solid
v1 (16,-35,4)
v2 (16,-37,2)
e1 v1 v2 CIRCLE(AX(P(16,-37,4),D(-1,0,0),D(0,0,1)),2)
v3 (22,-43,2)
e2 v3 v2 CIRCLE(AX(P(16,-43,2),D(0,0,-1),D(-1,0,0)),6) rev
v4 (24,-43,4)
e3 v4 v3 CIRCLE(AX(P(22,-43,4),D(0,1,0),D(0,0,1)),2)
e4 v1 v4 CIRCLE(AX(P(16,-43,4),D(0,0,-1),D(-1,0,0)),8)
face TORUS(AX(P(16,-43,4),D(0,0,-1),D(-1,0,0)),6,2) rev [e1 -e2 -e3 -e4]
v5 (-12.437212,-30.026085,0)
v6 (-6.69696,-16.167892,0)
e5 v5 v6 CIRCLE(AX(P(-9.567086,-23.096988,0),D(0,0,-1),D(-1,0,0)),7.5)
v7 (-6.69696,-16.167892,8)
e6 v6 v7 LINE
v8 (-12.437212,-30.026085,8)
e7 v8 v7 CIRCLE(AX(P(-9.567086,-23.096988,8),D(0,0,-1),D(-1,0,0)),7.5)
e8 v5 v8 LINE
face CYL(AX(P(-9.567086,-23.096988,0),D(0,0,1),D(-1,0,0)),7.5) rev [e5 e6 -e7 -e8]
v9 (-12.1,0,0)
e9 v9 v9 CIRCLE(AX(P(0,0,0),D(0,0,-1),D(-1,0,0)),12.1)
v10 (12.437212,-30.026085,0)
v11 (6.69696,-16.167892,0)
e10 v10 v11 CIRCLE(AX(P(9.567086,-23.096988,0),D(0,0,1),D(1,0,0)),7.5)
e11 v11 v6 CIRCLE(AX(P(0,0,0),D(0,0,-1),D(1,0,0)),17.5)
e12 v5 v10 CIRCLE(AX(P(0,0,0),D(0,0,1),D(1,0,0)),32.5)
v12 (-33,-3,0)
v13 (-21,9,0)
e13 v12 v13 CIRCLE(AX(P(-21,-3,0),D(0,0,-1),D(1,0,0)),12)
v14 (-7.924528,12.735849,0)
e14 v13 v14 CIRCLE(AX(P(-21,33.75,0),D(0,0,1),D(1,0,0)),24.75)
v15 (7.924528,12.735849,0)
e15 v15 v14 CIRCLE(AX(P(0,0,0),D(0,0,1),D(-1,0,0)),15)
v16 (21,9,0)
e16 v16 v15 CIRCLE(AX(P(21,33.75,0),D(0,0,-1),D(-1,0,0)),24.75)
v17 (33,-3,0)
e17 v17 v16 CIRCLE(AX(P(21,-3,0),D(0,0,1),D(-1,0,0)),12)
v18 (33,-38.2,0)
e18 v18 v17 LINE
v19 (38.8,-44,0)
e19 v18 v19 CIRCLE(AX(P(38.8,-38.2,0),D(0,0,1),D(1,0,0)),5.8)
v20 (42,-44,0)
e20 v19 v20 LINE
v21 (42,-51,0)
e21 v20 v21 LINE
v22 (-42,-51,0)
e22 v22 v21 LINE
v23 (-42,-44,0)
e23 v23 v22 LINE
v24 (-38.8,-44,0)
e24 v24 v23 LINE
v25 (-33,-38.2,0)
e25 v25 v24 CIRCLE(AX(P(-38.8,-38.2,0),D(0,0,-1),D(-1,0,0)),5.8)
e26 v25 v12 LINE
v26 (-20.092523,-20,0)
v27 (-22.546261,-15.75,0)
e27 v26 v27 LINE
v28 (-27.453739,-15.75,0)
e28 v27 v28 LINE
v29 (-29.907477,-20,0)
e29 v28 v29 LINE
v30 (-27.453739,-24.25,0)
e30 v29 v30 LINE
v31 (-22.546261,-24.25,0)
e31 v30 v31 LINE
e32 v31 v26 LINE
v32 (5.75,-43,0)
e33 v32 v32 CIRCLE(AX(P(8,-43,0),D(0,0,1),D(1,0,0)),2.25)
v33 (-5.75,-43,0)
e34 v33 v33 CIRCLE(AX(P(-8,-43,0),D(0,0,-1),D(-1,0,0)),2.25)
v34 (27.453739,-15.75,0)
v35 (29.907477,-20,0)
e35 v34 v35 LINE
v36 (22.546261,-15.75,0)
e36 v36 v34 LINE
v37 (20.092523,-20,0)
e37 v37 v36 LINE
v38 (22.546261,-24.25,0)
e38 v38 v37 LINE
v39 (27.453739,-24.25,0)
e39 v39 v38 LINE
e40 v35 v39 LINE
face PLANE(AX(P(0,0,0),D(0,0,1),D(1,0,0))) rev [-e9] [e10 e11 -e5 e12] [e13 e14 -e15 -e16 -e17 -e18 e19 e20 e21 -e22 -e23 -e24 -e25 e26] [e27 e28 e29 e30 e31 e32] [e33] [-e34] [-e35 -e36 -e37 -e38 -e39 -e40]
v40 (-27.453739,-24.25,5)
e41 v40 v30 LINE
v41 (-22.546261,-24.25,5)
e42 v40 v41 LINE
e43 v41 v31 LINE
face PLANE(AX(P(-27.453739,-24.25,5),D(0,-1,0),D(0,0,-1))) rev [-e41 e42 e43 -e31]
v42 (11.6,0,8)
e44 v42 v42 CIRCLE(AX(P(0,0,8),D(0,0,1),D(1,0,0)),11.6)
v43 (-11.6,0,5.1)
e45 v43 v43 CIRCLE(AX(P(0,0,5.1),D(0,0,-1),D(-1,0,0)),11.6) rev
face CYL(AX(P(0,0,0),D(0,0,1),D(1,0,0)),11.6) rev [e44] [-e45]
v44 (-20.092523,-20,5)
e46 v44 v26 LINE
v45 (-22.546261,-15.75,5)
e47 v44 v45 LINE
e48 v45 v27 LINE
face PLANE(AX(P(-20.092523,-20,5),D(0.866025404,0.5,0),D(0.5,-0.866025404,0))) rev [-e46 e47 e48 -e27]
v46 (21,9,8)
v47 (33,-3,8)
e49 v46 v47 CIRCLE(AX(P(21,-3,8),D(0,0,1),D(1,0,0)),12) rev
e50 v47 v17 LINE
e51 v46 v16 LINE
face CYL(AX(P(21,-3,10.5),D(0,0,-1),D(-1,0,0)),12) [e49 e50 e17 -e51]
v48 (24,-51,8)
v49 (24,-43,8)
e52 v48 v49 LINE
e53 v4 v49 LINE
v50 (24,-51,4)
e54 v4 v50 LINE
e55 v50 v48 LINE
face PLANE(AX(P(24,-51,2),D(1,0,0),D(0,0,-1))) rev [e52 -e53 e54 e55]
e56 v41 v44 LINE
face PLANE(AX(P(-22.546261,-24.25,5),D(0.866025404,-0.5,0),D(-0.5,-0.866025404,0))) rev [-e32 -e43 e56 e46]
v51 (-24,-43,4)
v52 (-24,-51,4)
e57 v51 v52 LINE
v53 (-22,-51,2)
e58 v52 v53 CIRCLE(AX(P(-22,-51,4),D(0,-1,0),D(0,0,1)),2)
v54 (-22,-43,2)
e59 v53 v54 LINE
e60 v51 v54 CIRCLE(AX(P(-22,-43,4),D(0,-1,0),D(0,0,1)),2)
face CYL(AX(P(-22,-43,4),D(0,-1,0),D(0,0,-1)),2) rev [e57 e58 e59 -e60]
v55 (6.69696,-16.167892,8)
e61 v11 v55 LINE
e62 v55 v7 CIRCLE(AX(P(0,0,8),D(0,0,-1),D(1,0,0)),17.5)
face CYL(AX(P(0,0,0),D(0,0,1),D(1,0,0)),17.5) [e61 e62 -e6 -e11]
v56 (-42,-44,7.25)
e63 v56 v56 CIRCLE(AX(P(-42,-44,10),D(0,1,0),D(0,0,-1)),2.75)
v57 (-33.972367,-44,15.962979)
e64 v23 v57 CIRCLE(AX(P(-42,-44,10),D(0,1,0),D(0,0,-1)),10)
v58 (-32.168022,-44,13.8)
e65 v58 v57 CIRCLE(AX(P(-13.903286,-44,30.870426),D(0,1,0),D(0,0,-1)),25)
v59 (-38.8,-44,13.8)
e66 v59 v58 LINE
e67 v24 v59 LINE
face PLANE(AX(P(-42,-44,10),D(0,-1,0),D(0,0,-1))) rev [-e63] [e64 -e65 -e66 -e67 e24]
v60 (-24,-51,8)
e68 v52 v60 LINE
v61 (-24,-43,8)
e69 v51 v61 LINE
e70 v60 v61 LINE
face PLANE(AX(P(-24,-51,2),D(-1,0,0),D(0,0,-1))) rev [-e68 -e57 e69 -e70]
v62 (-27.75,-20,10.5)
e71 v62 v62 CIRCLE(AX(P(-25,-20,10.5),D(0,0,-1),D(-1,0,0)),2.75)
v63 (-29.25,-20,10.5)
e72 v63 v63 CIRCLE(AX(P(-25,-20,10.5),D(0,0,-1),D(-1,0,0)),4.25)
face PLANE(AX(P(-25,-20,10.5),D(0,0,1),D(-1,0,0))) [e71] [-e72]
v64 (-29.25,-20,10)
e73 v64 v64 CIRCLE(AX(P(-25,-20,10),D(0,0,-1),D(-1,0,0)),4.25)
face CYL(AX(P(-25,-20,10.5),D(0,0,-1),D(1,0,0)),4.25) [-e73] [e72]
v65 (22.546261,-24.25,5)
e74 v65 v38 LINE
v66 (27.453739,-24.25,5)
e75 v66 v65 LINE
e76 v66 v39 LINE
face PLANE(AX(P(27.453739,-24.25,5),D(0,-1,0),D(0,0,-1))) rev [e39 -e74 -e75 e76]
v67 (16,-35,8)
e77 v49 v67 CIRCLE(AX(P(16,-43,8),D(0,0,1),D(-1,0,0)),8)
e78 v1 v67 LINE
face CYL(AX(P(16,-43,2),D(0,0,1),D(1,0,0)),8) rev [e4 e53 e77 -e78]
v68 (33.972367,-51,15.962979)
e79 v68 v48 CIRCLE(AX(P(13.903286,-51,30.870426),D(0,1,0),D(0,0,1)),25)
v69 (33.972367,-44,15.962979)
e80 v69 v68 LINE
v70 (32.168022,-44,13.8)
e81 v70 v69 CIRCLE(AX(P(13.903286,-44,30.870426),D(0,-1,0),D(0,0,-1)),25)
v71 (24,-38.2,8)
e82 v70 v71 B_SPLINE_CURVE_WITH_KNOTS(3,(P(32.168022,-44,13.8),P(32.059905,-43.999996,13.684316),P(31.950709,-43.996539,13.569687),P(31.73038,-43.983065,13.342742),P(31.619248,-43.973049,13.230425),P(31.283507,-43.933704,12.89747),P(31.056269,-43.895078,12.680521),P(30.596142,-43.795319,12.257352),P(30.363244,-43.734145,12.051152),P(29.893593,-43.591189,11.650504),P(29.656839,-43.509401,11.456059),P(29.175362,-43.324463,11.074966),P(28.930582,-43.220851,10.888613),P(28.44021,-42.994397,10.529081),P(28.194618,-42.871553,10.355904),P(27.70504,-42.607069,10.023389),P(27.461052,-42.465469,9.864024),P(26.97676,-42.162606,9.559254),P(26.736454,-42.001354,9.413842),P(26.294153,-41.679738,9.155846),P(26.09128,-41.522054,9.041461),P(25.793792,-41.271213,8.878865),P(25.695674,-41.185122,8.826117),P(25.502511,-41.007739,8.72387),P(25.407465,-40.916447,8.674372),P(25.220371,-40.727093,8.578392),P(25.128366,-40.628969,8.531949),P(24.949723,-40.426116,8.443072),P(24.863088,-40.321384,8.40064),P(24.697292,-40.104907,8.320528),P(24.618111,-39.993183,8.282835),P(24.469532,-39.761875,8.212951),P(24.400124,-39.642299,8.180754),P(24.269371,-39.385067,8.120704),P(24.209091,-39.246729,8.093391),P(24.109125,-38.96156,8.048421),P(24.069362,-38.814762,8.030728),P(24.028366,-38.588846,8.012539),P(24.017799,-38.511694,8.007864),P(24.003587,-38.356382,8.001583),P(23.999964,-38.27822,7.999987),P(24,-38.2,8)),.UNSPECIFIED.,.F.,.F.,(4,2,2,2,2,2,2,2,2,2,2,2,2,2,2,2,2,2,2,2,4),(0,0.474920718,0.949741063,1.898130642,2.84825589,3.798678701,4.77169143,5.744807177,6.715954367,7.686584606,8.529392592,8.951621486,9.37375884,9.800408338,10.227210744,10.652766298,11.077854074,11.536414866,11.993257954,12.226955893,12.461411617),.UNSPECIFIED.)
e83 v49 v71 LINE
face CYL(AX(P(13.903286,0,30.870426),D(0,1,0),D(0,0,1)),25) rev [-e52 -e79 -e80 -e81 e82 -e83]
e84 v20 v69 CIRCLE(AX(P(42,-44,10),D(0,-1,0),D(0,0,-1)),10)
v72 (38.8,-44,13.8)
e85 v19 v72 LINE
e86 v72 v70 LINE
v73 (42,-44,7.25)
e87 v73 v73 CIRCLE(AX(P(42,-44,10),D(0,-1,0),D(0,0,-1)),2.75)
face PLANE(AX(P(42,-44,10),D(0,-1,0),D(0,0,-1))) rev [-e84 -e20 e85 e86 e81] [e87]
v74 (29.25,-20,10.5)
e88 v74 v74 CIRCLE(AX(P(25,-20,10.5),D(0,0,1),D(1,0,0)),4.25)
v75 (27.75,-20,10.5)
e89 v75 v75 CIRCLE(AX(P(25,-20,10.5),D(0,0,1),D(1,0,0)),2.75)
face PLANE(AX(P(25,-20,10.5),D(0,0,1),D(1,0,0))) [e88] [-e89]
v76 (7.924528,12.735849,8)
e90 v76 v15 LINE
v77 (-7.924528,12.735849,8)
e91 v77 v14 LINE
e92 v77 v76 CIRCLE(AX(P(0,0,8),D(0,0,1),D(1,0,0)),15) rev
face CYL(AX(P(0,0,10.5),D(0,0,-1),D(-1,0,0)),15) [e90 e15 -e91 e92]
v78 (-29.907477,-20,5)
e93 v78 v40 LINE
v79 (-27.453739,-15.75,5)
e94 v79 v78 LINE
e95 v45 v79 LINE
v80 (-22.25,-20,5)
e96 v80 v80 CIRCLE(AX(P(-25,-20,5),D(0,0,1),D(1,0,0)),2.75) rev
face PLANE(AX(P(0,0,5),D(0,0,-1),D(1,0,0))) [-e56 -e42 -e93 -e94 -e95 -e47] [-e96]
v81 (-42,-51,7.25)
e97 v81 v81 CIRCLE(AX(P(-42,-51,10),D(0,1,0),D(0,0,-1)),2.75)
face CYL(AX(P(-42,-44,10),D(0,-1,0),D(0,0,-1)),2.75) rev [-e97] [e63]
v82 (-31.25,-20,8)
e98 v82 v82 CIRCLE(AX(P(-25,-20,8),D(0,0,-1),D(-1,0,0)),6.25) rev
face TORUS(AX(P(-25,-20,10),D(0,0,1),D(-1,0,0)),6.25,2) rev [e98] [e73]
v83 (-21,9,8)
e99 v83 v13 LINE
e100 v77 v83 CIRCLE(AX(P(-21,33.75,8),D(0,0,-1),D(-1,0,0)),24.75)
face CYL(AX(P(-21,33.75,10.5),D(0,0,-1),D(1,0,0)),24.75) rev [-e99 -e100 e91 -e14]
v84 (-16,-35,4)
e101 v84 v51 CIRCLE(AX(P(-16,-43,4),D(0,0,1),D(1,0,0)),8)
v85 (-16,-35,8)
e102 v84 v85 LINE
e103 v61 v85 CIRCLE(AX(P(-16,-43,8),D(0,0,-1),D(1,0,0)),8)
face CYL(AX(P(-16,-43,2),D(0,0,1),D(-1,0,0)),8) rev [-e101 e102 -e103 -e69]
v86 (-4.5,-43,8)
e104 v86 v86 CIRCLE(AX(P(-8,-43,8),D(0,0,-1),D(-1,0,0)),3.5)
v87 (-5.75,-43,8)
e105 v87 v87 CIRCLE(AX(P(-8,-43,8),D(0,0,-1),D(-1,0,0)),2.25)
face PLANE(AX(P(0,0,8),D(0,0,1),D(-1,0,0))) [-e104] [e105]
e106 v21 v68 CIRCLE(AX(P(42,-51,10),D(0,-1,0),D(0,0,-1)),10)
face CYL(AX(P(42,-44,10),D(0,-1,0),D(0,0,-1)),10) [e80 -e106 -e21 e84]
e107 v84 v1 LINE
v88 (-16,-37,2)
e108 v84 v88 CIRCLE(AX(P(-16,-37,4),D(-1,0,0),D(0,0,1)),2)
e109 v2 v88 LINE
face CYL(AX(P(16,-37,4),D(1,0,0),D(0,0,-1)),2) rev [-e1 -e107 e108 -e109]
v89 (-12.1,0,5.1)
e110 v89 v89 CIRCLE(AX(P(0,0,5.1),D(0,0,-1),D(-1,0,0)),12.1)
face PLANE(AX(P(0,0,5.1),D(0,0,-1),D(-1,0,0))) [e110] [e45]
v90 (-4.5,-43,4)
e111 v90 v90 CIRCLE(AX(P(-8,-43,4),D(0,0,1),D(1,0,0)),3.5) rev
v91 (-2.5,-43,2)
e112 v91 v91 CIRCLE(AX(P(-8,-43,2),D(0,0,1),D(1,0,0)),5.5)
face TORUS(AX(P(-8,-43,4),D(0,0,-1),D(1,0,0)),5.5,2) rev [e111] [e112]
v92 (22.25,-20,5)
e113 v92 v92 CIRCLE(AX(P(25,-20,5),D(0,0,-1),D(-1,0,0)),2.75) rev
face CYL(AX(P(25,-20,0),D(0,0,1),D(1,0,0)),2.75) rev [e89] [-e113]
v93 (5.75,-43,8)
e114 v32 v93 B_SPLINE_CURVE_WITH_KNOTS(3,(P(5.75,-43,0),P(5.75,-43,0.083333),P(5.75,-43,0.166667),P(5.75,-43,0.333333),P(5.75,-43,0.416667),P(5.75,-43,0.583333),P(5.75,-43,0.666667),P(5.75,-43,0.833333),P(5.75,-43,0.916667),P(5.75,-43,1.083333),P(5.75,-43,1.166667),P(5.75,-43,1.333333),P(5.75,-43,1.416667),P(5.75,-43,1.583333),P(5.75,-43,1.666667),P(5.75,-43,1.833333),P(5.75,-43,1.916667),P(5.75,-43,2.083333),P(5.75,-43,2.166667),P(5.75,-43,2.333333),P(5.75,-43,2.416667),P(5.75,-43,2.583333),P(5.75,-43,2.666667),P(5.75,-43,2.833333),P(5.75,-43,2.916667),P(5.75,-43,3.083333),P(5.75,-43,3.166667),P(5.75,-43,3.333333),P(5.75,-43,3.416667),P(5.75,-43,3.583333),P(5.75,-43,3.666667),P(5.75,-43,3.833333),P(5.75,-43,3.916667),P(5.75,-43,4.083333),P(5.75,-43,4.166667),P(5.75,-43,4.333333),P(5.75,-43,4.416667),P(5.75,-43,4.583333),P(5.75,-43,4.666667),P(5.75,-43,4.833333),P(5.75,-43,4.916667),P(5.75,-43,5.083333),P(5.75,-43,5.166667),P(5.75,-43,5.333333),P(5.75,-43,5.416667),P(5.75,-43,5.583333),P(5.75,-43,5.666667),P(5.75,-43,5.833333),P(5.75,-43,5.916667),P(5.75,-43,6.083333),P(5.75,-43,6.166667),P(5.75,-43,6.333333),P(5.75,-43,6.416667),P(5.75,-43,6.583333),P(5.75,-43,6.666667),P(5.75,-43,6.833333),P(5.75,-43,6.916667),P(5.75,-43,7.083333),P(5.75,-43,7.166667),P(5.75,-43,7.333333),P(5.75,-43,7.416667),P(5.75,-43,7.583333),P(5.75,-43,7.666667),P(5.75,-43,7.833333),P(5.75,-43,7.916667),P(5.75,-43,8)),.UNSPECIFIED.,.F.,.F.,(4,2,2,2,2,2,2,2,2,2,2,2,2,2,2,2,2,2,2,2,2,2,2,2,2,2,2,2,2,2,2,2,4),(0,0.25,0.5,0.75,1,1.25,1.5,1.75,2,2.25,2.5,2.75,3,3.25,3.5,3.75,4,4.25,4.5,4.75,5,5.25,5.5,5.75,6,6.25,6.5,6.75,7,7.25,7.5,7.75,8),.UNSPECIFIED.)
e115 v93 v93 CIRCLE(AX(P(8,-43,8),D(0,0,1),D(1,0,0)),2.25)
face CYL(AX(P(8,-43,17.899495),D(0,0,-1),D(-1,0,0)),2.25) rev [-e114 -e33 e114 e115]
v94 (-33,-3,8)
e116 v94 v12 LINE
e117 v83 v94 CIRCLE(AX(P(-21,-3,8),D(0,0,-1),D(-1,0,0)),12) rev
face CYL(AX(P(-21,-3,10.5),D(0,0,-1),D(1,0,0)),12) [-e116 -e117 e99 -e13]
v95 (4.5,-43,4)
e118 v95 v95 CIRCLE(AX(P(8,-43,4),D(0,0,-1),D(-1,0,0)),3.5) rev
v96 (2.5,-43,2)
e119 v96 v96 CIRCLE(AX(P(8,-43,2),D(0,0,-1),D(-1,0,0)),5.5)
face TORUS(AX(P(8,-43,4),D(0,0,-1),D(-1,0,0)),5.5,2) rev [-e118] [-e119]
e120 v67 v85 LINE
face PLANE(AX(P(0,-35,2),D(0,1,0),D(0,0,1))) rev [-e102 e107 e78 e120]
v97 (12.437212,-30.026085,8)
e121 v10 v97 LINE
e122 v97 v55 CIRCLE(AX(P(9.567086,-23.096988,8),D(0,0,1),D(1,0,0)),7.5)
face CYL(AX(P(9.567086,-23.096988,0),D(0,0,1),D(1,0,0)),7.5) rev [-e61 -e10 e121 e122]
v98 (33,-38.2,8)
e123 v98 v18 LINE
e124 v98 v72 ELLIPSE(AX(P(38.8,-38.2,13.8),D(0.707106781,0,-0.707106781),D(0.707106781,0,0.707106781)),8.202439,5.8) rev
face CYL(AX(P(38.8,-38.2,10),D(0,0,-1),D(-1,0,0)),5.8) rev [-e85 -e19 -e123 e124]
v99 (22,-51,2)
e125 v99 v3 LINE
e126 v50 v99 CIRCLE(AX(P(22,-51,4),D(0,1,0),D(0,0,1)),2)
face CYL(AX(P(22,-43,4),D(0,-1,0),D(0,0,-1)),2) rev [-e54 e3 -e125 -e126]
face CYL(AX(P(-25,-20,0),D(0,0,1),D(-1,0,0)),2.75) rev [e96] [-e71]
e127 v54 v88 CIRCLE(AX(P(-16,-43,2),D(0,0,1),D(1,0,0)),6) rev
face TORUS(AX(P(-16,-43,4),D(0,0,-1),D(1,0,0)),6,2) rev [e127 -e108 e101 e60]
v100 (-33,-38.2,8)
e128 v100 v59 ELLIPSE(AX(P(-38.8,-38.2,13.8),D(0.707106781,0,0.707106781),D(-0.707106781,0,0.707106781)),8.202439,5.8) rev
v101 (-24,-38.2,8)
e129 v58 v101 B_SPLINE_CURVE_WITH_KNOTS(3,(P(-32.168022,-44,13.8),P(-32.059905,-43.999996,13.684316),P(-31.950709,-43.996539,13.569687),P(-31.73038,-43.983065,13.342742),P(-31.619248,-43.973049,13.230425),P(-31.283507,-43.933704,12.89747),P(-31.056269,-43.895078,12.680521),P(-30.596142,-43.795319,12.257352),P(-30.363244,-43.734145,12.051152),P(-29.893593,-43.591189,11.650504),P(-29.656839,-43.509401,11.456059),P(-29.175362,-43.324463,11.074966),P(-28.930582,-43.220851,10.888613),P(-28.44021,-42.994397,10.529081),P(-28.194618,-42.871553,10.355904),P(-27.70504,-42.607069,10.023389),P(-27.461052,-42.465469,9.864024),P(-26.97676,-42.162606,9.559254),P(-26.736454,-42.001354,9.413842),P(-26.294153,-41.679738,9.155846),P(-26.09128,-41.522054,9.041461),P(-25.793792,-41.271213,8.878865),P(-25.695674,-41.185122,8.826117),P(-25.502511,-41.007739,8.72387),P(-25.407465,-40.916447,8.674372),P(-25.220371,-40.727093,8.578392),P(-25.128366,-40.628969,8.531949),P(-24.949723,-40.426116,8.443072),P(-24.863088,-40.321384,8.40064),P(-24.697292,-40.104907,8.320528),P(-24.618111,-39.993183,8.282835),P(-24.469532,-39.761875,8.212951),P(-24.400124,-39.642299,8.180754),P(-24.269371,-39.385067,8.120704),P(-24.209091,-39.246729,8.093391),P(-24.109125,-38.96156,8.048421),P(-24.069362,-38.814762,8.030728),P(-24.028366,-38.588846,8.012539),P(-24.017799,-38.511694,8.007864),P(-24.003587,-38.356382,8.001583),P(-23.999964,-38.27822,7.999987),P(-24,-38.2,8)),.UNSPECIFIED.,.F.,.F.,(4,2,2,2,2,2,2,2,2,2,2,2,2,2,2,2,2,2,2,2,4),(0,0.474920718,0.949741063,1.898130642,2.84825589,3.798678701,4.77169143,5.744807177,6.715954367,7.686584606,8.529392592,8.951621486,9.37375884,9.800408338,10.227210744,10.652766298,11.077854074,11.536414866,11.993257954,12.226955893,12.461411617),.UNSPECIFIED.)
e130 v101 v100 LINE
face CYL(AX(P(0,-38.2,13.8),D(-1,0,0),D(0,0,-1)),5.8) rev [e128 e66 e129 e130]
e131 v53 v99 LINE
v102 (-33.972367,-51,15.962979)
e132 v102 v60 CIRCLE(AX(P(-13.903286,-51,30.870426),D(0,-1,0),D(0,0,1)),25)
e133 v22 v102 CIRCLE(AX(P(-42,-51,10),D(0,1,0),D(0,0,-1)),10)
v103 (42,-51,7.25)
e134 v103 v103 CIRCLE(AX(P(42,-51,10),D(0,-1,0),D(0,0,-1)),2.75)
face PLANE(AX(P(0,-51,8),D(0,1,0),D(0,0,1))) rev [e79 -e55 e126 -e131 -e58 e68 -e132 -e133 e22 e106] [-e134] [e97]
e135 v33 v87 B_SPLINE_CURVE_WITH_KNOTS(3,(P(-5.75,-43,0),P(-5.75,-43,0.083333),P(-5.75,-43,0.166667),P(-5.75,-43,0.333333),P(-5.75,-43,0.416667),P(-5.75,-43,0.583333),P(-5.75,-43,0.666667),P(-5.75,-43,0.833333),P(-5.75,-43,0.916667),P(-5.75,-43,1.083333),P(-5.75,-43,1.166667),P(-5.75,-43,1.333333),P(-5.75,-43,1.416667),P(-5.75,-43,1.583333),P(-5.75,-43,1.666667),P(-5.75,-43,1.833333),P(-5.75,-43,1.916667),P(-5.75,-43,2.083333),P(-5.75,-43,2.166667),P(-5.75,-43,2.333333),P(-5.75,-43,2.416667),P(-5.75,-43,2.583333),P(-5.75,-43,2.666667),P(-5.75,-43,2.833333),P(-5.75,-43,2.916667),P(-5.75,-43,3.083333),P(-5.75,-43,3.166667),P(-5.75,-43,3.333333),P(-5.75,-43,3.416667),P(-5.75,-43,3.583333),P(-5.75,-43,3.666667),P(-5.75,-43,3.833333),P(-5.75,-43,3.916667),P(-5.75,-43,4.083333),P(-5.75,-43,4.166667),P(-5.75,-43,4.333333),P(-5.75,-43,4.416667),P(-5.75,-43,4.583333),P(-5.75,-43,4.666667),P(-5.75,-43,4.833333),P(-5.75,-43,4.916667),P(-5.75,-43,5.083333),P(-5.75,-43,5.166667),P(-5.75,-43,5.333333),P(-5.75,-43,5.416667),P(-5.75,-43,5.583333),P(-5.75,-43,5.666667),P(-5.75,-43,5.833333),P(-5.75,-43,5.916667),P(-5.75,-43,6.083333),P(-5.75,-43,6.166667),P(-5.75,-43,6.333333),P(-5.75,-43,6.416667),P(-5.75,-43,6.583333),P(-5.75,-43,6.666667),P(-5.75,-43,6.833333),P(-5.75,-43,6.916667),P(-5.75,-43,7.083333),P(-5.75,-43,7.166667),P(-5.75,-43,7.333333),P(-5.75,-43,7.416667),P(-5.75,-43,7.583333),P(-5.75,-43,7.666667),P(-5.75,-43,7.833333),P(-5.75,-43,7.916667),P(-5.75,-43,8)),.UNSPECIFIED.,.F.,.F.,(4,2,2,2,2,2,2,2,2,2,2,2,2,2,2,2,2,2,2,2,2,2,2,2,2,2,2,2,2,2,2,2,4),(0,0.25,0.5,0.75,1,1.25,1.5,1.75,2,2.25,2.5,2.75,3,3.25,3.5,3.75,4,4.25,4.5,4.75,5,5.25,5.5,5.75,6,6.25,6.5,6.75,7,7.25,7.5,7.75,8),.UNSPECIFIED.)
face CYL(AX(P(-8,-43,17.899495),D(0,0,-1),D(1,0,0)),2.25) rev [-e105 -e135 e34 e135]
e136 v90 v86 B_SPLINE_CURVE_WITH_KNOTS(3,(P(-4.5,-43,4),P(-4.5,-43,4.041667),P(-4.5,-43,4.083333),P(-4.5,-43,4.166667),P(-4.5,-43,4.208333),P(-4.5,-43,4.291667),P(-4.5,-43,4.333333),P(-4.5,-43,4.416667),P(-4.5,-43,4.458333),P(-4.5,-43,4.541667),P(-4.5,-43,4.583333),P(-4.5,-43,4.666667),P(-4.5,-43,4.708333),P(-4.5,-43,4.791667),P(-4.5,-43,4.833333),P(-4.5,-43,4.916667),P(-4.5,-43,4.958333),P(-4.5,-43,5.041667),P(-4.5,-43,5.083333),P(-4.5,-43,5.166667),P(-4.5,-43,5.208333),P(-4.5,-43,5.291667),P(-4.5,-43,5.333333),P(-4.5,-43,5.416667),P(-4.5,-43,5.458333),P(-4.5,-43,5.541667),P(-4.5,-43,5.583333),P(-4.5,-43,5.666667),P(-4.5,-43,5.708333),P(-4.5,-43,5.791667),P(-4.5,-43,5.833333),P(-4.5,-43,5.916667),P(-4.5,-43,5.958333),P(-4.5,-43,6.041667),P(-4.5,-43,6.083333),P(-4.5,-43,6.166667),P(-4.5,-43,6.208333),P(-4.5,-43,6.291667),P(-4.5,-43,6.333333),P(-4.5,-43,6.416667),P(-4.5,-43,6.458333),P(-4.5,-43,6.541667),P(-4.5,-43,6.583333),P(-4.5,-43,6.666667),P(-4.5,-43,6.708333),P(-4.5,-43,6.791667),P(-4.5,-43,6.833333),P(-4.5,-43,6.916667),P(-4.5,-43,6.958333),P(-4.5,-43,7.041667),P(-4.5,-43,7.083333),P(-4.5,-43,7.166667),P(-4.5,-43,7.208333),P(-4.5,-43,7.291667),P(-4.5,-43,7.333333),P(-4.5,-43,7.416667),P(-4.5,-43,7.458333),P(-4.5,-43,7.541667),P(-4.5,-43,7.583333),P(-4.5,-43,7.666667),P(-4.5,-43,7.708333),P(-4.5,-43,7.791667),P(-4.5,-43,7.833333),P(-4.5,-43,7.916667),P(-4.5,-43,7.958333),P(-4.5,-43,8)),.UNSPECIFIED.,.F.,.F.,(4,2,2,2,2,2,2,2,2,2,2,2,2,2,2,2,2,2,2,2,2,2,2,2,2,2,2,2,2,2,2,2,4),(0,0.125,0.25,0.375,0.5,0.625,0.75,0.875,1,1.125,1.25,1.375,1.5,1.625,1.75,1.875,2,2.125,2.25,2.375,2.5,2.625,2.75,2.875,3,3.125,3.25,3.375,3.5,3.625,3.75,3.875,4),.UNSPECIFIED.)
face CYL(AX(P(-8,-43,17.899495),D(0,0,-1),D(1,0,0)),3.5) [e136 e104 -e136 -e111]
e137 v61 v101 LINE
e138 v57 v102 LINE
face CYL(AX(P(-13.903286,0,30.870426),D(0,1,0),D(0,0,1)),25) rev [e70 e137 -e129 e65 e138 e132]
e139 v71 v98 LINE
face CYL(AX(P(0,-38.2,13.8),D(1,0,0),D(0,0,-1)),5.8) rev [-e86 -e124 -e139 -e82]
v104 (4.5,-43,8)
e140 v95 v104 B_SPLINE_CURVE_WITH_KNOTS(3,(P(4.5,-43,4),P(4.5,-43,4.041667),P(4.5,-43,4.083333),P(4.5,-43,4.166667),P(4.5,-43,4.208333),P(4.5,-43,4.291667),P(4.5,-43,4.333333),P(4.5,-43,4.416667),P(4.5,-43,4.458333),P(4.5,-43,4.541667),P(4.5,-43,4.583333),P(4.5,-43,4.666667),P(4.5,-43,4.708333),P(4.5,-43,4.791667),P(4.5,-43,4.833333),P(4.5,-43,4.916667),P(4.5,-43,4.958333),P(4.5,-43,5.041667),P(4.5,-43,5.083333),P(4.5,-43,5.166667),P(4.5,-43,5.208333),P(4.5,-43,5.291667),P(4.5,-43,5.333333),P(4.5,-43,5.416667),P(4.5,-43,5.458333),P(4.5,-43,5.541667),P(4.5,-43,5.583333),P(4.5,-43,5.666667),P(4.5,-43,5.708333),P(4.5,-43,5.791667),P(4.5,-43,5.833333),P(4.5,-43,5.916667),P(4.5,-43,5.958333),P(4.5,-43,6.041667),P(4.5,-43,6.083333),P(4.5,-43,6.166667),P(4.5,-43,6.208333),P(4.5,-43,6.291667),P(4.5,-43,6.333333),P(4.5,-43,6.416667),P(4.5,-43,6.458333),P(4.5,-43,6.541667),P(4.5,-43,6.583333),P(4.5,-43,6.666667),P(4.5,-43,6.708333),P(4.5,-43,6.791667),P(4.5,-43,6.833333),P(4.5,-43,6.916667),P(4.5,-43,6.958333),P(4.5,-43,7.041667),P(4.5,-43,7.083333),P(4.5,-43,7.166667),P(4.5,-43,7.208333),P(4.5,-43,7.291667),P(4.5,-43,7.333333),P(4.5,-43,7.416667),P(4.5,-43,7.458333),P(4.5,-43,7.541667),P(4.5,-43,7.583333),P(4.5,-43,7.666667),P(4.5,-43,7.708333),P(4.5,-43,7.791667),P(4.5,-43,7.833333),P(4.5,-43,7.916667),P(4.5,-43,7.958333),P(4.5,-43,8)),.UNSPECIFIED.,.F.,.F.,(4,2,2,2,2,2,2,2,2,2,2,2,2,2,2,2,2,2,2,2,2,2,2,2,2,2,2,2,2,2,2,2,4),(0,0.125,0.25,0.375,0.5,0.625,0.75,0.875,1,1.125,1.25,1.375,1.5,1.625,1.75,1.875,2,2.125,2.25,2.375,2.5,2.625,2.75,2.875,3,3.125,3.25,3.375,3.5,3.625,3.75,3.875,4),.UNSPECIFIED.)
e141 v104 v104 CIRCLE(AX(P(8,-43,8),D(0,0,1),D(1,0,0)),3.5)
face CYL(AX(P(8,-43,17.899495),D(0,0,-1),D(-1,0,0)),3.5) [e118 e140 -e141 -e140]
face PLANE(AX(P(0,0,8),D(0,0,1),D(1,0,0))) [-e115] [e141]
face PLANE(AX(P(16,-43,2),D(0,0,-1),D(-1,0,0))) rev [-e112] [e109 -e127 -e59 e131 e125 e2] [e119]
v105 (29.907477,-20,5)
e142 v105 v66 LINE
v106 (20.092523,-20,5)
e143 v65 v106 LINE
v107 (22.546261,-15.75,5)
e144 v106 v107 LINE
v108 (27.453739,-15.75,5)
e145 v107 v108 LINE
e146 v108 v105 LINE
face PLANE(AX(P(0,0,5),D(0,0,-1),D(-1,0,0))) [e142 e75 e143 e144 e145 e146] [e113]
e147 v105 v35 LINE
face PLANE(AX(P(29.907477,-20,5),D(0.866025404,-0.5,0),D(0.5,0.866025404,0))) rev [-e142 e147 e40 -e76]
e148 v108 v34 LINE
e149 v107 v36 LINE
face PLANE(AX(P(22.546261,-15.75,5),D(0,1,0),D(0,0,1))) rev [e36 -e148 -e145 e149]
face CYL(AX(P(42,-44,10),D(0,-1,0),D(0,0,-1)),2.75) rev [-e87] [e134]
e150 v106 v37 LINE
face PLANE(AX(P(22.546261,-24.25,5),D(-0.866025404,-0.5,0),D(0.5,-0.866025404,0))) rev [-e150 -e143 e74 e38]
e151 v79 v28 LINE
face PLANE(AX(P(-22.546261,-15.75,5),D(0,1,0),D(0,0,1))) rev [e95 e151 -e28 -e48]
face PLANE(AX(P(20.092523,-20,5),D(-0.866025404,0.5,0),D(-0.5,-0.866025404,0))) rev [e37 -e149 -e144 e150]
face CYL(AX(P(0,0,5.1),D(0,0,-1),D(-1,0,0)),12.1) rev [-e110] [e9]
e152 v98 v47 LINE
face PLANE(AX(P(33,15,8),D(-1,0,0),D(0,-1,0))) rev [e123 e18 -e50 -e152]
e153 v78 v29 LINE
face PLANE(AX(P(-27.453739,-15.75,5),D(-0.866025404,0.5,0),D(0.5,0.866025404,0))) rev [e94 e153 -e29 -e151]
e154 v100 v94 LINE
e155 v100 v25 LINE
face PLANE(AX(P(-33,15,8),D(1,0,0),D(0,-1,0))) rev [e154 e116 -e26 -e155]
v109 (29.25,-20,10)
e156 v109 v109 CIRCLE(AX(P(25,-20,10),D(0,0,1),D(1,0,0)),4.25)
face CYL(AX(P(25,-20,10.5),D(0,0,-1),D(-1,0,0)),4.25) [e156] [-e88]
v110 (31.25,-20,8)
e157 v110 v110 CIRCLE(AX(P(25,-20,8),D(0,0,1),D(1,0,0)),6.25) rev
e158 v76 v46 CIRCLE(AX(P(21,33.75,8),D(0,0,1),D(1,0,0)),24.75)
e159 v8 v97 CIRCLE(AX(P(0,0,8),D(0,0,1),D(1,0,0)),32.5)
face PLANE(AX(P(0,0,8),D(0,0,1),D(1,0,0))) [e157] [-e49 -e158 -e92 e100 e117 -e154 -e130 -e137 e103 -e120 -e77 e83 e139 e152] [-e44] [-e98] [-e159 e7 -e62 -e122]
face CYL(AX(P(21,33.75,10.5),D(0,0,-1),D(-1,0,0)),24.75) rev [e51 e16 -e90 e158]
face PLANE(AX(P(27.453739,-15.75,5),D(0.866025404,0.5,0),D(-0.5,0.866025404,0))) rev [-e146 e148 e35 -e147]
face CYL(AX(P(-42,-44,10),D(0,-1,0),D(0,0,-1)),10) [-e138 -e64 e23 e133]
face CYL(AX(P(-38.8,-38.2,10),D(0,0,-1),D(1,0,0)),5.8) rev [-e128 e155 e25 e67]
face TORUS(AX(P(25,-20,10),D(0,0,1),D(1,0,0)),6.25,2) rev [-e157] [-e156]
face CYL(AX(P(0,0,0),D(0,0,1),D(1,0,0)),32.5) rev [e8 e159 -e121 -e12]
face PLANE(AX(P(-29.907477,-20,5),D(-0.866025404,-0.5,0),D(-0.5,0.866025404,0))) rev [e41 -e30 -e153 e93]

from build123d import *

# Parameters (mm, degrees)
SKETCH1_W           = 33
SKETCH1_H           = 66
BOSS_EXTRUDE1_DEPTH = 8
SKETCH3_R           = 2.75
SKETCH3_R_2         = 11.6
CUT_EXTRUDE1_DEPTH  = 62.269894728
BOSS_EXTRUDE3_START = 2.5
SKETCH4_R           = 4.25
SKETCH4_R_2         = 2.75
BOSS_EXTRUDE3_DEPTH = 2.5
SKETCH6_R           = 12.1
CUT_EXTRUDE2_DEPTH  = 5.1
CUT_EXTRUDE6_DEPTH  = 62.646167764
SKETCH10_R          = 2.75
BOSS_EXTRUDE4_DEPTH = 7
CUT_EXTRUDE3_DEPTH  = 6
SKETCH12_R          = 2.75
CUT_EXTRUDE4_DEPTH  = 6
FILLET7_R           = 2
FILLET5_R           = 25
FILLET6_R           = 5.8
SKETCH15_R          = 3.5
SKETCH15_R_2        = 2.25
BOSS_EXTRUDE5_DEPTH = 8
CUT_EXTRUDE5_DEPTH  = 5
FILLET8_R           = 2


with BuildPart() as part:
    # Sketch1 → Boss-Extrude1 (new body)
    with BuildSketch(Plane.XY):
        with Locations((16.5, -18)):
            Rectangle(SKETCH1_W, SKETCH1_H)
    extrude(amount=BOSS_EXTRUDE1_DEPTH)

    # Sketch3 → Cut-Extrude1 (cut, through all)
    with BuildSketch(Plane.XY.offset(8)):
        with Locations((25, -20)):
            Circle(SKETCH3_R)
        Circle(SKETCH3_R_2)
        with BuildLine():
            Line((-17.5, 0), (-32.5, 0))
            ThreePointArc((-32.5, 0), (-18.056032573, -27.0227624), (12.437211552, -30.026084807))
            ThreePointArc((12.437211552, -30.026084807), (16.496182303, -20.22686257), (6.696960066, -16.167891819))
            ThreePointArc((6.696960066, -16.167891819), (-9.722479078, -14.550718215), (-17.5, 0))
        make_face()
    extrude(amount=-CUT_EXTRUDE1_DEPTH, mode=Mode.SUBTRACT)

    # Sketch4 → Boss-Extrude3 (add)
    with BuildSketch(Plane.XY.offset(8).offset(BOSS_EXTRUDE3_START)):
        with Locations((25, -20)):
            Circle(SKETCH4_R)
        with Locations((25, -20)):
            Circle(SKETCH4_R_2, mode=Mode.SUBTRACT)
    extrude(amount=-BOSS_EXTRUDE3_DEPTH)

    # Sketch6 → Cut-Extrude2 (cut)
    with BuildSketch(Plane(origin=(0, 0, 0), x_dir=(-1, 0, 0), z_dir=(0, 0, -1))):
        Circle(SKETCH6_R)
    extrude(amount=-CUT_EXTRUDE2_DEPTH, mode=Mode.SUBTRACT)

    # Sketch17 → Cut-Extrude6 (cut, through all)
    with BuildSketch(Plane(origin=(0, 0, 0), x_dir=(-1, 0, 0), z_dir=(0, 0, -1))):
        with BuildLine():
            Line((0, 15), (0, 35))
            Line((0, 35), (-33, 35))
            Line((-33, 35), (-33, -3))
            ThreePointArc((-33, -3), (-29.485281374, 5.485281374), (-21, 9))
            ThreePointArc((-21, 9), (-14.200652085, 9.952282296), (-7.924528302, 12.735849057))
            ThreePointArc((-7.924528302, 12.735849057), (-4.120816918, 14.422859215), (0, 15))
        make_face()
    extrude(amount=-CUT_EXTRUDE6_DEPTH, mode=Mode.SUBTRACT)

    # Sketch10 → Boss-Extrude4 (add)
    with BuildSketch(Plane.XZ.offset(51)):
        with BuildLine():
            Line((42, 0), (32, 0))
            Line((32, 0), (32, 10))
            ThreePointArc((32, 10), (49.071067812, 17.071067812), (42, 0))
        make_face()
        with Locations(Location((42, 10, 0), (0, 0, 270))):
            Circle(SKETCH10_R, mode=Mode.SUBTRACT)
    extrude(amount=-BOSS_EXTRUDE4_DEPTH)

    # Sketch11 → Cut-Extrude3 (cut)
    with BuildSketch(Plane.XY.offset(8)):
        with BuildLine():
            Line((0, -51), (24, -51))
            Line((24, -51), (24, -43))
            ThreePointArc((24, -43), (21.656854249, -37.343145751), (16, -35))
            Line((16, -35), (0, -35))
            Line((0, -35), (0, -51))
        make_face()
    extrude(amount=-CUT_EXTRUDE3_DEPTH, mode=Mode.SUBTRACT)

    # Sketch12 → Cut-Extrude4 (cut)
    with BuildSketch(Plane.XY.offset(2)):
        with Locations((8, -43)):
            Circle(SKETCH12_R)
    extrude(amount=-CUT_EXTRUDE4_DEPTH, mode=Mode.SUBTRACT)

    # Fillet7
    fillet7_edges = [part.edges().sort_by_distance(p)[0] for p in [
        (8, -35, 2),
        (21.656854249, -37.343145751, 2),
        (24, -47, 2),
    ]]
    fillet(fillet7_edges, radius=FILLET7_R)

    # Fillet5
    # the kernel refuses this fillet: 25 mm, written as the material it adds along each edge
    with BuildSketch(Plane(origin=(32, -44, 8), x_dir=(-1, 0, 0), z_dir=(0, -1, 0))) as fillet5_piece_1:
        with BuildLine():
            CenterArc((18.096713956, -22.870425604), FILLET5_R, 113.820244592, 29.574545381)
            Line((-1.972367441, -7.962978744), (-3.979275581, -6.472234058))
            ThreePointArc((-3.979275581, -6.472234058), (-2.5, -2), (-2.5, 0))
            Line((-2.5, 0), (0, 2.5))
            ThreePointArc((0, 2.5), (4, 2.5), (6.990328604, 2.28704256))
            Line((6.990328604, 2.28704256), (8, 0))
        make_face()
    extrude(amount=7)

    # Fillet6
    # the kernel refuses this fillet: 5.8 mm, written as the material it adds along each edge
    with BuildSketch(Plane(origin=(33, -44, 0), x_dir=(0, 1, 0), z_dir=(0, 0, 1))) as fillet6_piece_1:
        with BuildLine():
            CenterArc((FILLET6_R, -FILLET6_R), FILLET6_R, 90, 90)
            Line((0, -FILLET6_R), (0, 0))
            Line((0, 0), (FILLET6_R, 0))
        make_face()
    extrude(amount=8)
    with BuildSketch(Plane(origin=(33, -44, 8), x_dir=(0, 1, 0), z_dir=(-1, 0, 0))) as fillet6_piece_2_section:
        with BuildLine():
            CenterArc((FILLET6_R, -FILLET6_R), FILLET6_R, 90, 90)
            Line((0, -FILLET6_R), (0, 0))
            Line((0, 0), (FILLET6_R, 0))
        make_face()
    fillet6_piece_2 = extrude(amount=23.5, mode=Mode.PRIVATE)
    fillet6_piece_2 = fillet6_piece_2 - Plane(origin=(13.903286044, -44, 30.870425604), x_dir=(-1, 0, 0), z_dir=(0, 1, 0)) * Cylinder(25, 71, mode=Mode.PRIVATE)
    add(fillet6_piece_2)
    with BuildSketch(Plane(origin=(47.5, -44, 8), x_dir=(0, 1, 0), z_dir=(-1, 0, 0))) as fillet6_piece_3a_section:
        with BuildLine():
            CenterArc((FILLET6_R, -FILLET6_R), FILLET6_R, 90, 90)
            Line((0, -FILLET6_R), (0, 0))
            Line((0, 0), (FILLET6_R, 0))
        make_face()
    fillet6_piece_3a = extrude(amount=23.5, mode=Mode.PRIVATE)
    fillet6_piece_3a = fillet6_piece_3a - Plane(origin=(42, -44, 10), x_dir=(0, 0, -1), z_dir=(0, -1, 0)) * Cylinder(2.75, 71, mode=Mode.PRIVATE)
    fillet6_piece_3a = split(fillet6_piece_3a, bisect_by=Plane(origin=(33, -44, 8), z_dir=(1, 0, 0)), keep=Keep.TOP, mode=Mode.PRIVATE)
    with BuildSketch(Plane(origin=(33, -44, 0), x_dir=(0, 1, 0), z_dir=(0, 0, 1))) as fillet6_piece_3b_section:
        with BuildLine():
            CenterArc((FILLET6_R, -FILLET6_R), FILLET6_R, 90, 90)
            Line((0, -FILLET6_R), (0, 0))
            Line((0, 0), (FILLET6_R, 0))
        make_face()
    fillet6_piece_3b = extrude(amount=22.5, mode=Mode.PRIVATE)
    fillet6_piece_3b = split(fillet6_piece_3b, bisect_by=Plane(origin=(33, -44, 8), z_dir=(0, 0, 1)), keep=Keep.TOP, mode=Mode.PRIVATE)
    fillet6_piece_3b = fillet6_piece_3b & Plane(origin=(42, -44, 10), x_dir=(-1, 0, 0), z_dir=(0, -1, 0)) * Cylinder(10, 69, mode=Mode.PRIVATE)
    fillet6_piece_3 = fillet6_piece_3a & fillet6_piece_3b
    add(fillet6_piece_3)

    # Sketch15 → Boss-Extrude5 (add)
    with BuildSketch(Plane.XY):
        with Locations(Location((8, -43, 0), (0, 0, 180))):
            Circle(SKETCH15_R)
        with Locations(Location((8, -43, 0), (0, 0, 180))):
            Circle(SKETCH15_R_2, mode=Mode.SUBTRACT)
    extrude(amount=BOSS_EXTRUDE5_DEPTH)

    # Sketch13 → Cut-Extrude5 (cut)
    with BuildSketch(Plane(origin=(0, 0, 0), x_dir=(-1, 0, 0), z_dir=(0, 0, -1))):
        Polygon((-22.546261356, -15.75), (-27.453738644, -15.75), (-29.907477288, -20), (-27.453738644, -24.25), (-22.546261356, -24.25), (-20.092522712, -20), align=None)
    extrude(amount=-CUT_EXTRUDE5_DEPTH, mode=Mode.SUBTRACT)

    # Fillet8
    fillet8_edges = [part.edges().sort_by_distance(p)[0] for p in [
        (11.5, -43, 2),
        (20.75, -20, 8),
    ]]
    fillet(fillet8_edges, radius=FILLET8_R)

    # Mirror1: part across plane


with BuildPart() as part_1:
    add(part.part)
    add(part.part.mirror(Plane(origin=(0, 15, 8), x_dir=(0, 0, 1), z_dir=(1, 0, 0))))


solid = part_1.part
